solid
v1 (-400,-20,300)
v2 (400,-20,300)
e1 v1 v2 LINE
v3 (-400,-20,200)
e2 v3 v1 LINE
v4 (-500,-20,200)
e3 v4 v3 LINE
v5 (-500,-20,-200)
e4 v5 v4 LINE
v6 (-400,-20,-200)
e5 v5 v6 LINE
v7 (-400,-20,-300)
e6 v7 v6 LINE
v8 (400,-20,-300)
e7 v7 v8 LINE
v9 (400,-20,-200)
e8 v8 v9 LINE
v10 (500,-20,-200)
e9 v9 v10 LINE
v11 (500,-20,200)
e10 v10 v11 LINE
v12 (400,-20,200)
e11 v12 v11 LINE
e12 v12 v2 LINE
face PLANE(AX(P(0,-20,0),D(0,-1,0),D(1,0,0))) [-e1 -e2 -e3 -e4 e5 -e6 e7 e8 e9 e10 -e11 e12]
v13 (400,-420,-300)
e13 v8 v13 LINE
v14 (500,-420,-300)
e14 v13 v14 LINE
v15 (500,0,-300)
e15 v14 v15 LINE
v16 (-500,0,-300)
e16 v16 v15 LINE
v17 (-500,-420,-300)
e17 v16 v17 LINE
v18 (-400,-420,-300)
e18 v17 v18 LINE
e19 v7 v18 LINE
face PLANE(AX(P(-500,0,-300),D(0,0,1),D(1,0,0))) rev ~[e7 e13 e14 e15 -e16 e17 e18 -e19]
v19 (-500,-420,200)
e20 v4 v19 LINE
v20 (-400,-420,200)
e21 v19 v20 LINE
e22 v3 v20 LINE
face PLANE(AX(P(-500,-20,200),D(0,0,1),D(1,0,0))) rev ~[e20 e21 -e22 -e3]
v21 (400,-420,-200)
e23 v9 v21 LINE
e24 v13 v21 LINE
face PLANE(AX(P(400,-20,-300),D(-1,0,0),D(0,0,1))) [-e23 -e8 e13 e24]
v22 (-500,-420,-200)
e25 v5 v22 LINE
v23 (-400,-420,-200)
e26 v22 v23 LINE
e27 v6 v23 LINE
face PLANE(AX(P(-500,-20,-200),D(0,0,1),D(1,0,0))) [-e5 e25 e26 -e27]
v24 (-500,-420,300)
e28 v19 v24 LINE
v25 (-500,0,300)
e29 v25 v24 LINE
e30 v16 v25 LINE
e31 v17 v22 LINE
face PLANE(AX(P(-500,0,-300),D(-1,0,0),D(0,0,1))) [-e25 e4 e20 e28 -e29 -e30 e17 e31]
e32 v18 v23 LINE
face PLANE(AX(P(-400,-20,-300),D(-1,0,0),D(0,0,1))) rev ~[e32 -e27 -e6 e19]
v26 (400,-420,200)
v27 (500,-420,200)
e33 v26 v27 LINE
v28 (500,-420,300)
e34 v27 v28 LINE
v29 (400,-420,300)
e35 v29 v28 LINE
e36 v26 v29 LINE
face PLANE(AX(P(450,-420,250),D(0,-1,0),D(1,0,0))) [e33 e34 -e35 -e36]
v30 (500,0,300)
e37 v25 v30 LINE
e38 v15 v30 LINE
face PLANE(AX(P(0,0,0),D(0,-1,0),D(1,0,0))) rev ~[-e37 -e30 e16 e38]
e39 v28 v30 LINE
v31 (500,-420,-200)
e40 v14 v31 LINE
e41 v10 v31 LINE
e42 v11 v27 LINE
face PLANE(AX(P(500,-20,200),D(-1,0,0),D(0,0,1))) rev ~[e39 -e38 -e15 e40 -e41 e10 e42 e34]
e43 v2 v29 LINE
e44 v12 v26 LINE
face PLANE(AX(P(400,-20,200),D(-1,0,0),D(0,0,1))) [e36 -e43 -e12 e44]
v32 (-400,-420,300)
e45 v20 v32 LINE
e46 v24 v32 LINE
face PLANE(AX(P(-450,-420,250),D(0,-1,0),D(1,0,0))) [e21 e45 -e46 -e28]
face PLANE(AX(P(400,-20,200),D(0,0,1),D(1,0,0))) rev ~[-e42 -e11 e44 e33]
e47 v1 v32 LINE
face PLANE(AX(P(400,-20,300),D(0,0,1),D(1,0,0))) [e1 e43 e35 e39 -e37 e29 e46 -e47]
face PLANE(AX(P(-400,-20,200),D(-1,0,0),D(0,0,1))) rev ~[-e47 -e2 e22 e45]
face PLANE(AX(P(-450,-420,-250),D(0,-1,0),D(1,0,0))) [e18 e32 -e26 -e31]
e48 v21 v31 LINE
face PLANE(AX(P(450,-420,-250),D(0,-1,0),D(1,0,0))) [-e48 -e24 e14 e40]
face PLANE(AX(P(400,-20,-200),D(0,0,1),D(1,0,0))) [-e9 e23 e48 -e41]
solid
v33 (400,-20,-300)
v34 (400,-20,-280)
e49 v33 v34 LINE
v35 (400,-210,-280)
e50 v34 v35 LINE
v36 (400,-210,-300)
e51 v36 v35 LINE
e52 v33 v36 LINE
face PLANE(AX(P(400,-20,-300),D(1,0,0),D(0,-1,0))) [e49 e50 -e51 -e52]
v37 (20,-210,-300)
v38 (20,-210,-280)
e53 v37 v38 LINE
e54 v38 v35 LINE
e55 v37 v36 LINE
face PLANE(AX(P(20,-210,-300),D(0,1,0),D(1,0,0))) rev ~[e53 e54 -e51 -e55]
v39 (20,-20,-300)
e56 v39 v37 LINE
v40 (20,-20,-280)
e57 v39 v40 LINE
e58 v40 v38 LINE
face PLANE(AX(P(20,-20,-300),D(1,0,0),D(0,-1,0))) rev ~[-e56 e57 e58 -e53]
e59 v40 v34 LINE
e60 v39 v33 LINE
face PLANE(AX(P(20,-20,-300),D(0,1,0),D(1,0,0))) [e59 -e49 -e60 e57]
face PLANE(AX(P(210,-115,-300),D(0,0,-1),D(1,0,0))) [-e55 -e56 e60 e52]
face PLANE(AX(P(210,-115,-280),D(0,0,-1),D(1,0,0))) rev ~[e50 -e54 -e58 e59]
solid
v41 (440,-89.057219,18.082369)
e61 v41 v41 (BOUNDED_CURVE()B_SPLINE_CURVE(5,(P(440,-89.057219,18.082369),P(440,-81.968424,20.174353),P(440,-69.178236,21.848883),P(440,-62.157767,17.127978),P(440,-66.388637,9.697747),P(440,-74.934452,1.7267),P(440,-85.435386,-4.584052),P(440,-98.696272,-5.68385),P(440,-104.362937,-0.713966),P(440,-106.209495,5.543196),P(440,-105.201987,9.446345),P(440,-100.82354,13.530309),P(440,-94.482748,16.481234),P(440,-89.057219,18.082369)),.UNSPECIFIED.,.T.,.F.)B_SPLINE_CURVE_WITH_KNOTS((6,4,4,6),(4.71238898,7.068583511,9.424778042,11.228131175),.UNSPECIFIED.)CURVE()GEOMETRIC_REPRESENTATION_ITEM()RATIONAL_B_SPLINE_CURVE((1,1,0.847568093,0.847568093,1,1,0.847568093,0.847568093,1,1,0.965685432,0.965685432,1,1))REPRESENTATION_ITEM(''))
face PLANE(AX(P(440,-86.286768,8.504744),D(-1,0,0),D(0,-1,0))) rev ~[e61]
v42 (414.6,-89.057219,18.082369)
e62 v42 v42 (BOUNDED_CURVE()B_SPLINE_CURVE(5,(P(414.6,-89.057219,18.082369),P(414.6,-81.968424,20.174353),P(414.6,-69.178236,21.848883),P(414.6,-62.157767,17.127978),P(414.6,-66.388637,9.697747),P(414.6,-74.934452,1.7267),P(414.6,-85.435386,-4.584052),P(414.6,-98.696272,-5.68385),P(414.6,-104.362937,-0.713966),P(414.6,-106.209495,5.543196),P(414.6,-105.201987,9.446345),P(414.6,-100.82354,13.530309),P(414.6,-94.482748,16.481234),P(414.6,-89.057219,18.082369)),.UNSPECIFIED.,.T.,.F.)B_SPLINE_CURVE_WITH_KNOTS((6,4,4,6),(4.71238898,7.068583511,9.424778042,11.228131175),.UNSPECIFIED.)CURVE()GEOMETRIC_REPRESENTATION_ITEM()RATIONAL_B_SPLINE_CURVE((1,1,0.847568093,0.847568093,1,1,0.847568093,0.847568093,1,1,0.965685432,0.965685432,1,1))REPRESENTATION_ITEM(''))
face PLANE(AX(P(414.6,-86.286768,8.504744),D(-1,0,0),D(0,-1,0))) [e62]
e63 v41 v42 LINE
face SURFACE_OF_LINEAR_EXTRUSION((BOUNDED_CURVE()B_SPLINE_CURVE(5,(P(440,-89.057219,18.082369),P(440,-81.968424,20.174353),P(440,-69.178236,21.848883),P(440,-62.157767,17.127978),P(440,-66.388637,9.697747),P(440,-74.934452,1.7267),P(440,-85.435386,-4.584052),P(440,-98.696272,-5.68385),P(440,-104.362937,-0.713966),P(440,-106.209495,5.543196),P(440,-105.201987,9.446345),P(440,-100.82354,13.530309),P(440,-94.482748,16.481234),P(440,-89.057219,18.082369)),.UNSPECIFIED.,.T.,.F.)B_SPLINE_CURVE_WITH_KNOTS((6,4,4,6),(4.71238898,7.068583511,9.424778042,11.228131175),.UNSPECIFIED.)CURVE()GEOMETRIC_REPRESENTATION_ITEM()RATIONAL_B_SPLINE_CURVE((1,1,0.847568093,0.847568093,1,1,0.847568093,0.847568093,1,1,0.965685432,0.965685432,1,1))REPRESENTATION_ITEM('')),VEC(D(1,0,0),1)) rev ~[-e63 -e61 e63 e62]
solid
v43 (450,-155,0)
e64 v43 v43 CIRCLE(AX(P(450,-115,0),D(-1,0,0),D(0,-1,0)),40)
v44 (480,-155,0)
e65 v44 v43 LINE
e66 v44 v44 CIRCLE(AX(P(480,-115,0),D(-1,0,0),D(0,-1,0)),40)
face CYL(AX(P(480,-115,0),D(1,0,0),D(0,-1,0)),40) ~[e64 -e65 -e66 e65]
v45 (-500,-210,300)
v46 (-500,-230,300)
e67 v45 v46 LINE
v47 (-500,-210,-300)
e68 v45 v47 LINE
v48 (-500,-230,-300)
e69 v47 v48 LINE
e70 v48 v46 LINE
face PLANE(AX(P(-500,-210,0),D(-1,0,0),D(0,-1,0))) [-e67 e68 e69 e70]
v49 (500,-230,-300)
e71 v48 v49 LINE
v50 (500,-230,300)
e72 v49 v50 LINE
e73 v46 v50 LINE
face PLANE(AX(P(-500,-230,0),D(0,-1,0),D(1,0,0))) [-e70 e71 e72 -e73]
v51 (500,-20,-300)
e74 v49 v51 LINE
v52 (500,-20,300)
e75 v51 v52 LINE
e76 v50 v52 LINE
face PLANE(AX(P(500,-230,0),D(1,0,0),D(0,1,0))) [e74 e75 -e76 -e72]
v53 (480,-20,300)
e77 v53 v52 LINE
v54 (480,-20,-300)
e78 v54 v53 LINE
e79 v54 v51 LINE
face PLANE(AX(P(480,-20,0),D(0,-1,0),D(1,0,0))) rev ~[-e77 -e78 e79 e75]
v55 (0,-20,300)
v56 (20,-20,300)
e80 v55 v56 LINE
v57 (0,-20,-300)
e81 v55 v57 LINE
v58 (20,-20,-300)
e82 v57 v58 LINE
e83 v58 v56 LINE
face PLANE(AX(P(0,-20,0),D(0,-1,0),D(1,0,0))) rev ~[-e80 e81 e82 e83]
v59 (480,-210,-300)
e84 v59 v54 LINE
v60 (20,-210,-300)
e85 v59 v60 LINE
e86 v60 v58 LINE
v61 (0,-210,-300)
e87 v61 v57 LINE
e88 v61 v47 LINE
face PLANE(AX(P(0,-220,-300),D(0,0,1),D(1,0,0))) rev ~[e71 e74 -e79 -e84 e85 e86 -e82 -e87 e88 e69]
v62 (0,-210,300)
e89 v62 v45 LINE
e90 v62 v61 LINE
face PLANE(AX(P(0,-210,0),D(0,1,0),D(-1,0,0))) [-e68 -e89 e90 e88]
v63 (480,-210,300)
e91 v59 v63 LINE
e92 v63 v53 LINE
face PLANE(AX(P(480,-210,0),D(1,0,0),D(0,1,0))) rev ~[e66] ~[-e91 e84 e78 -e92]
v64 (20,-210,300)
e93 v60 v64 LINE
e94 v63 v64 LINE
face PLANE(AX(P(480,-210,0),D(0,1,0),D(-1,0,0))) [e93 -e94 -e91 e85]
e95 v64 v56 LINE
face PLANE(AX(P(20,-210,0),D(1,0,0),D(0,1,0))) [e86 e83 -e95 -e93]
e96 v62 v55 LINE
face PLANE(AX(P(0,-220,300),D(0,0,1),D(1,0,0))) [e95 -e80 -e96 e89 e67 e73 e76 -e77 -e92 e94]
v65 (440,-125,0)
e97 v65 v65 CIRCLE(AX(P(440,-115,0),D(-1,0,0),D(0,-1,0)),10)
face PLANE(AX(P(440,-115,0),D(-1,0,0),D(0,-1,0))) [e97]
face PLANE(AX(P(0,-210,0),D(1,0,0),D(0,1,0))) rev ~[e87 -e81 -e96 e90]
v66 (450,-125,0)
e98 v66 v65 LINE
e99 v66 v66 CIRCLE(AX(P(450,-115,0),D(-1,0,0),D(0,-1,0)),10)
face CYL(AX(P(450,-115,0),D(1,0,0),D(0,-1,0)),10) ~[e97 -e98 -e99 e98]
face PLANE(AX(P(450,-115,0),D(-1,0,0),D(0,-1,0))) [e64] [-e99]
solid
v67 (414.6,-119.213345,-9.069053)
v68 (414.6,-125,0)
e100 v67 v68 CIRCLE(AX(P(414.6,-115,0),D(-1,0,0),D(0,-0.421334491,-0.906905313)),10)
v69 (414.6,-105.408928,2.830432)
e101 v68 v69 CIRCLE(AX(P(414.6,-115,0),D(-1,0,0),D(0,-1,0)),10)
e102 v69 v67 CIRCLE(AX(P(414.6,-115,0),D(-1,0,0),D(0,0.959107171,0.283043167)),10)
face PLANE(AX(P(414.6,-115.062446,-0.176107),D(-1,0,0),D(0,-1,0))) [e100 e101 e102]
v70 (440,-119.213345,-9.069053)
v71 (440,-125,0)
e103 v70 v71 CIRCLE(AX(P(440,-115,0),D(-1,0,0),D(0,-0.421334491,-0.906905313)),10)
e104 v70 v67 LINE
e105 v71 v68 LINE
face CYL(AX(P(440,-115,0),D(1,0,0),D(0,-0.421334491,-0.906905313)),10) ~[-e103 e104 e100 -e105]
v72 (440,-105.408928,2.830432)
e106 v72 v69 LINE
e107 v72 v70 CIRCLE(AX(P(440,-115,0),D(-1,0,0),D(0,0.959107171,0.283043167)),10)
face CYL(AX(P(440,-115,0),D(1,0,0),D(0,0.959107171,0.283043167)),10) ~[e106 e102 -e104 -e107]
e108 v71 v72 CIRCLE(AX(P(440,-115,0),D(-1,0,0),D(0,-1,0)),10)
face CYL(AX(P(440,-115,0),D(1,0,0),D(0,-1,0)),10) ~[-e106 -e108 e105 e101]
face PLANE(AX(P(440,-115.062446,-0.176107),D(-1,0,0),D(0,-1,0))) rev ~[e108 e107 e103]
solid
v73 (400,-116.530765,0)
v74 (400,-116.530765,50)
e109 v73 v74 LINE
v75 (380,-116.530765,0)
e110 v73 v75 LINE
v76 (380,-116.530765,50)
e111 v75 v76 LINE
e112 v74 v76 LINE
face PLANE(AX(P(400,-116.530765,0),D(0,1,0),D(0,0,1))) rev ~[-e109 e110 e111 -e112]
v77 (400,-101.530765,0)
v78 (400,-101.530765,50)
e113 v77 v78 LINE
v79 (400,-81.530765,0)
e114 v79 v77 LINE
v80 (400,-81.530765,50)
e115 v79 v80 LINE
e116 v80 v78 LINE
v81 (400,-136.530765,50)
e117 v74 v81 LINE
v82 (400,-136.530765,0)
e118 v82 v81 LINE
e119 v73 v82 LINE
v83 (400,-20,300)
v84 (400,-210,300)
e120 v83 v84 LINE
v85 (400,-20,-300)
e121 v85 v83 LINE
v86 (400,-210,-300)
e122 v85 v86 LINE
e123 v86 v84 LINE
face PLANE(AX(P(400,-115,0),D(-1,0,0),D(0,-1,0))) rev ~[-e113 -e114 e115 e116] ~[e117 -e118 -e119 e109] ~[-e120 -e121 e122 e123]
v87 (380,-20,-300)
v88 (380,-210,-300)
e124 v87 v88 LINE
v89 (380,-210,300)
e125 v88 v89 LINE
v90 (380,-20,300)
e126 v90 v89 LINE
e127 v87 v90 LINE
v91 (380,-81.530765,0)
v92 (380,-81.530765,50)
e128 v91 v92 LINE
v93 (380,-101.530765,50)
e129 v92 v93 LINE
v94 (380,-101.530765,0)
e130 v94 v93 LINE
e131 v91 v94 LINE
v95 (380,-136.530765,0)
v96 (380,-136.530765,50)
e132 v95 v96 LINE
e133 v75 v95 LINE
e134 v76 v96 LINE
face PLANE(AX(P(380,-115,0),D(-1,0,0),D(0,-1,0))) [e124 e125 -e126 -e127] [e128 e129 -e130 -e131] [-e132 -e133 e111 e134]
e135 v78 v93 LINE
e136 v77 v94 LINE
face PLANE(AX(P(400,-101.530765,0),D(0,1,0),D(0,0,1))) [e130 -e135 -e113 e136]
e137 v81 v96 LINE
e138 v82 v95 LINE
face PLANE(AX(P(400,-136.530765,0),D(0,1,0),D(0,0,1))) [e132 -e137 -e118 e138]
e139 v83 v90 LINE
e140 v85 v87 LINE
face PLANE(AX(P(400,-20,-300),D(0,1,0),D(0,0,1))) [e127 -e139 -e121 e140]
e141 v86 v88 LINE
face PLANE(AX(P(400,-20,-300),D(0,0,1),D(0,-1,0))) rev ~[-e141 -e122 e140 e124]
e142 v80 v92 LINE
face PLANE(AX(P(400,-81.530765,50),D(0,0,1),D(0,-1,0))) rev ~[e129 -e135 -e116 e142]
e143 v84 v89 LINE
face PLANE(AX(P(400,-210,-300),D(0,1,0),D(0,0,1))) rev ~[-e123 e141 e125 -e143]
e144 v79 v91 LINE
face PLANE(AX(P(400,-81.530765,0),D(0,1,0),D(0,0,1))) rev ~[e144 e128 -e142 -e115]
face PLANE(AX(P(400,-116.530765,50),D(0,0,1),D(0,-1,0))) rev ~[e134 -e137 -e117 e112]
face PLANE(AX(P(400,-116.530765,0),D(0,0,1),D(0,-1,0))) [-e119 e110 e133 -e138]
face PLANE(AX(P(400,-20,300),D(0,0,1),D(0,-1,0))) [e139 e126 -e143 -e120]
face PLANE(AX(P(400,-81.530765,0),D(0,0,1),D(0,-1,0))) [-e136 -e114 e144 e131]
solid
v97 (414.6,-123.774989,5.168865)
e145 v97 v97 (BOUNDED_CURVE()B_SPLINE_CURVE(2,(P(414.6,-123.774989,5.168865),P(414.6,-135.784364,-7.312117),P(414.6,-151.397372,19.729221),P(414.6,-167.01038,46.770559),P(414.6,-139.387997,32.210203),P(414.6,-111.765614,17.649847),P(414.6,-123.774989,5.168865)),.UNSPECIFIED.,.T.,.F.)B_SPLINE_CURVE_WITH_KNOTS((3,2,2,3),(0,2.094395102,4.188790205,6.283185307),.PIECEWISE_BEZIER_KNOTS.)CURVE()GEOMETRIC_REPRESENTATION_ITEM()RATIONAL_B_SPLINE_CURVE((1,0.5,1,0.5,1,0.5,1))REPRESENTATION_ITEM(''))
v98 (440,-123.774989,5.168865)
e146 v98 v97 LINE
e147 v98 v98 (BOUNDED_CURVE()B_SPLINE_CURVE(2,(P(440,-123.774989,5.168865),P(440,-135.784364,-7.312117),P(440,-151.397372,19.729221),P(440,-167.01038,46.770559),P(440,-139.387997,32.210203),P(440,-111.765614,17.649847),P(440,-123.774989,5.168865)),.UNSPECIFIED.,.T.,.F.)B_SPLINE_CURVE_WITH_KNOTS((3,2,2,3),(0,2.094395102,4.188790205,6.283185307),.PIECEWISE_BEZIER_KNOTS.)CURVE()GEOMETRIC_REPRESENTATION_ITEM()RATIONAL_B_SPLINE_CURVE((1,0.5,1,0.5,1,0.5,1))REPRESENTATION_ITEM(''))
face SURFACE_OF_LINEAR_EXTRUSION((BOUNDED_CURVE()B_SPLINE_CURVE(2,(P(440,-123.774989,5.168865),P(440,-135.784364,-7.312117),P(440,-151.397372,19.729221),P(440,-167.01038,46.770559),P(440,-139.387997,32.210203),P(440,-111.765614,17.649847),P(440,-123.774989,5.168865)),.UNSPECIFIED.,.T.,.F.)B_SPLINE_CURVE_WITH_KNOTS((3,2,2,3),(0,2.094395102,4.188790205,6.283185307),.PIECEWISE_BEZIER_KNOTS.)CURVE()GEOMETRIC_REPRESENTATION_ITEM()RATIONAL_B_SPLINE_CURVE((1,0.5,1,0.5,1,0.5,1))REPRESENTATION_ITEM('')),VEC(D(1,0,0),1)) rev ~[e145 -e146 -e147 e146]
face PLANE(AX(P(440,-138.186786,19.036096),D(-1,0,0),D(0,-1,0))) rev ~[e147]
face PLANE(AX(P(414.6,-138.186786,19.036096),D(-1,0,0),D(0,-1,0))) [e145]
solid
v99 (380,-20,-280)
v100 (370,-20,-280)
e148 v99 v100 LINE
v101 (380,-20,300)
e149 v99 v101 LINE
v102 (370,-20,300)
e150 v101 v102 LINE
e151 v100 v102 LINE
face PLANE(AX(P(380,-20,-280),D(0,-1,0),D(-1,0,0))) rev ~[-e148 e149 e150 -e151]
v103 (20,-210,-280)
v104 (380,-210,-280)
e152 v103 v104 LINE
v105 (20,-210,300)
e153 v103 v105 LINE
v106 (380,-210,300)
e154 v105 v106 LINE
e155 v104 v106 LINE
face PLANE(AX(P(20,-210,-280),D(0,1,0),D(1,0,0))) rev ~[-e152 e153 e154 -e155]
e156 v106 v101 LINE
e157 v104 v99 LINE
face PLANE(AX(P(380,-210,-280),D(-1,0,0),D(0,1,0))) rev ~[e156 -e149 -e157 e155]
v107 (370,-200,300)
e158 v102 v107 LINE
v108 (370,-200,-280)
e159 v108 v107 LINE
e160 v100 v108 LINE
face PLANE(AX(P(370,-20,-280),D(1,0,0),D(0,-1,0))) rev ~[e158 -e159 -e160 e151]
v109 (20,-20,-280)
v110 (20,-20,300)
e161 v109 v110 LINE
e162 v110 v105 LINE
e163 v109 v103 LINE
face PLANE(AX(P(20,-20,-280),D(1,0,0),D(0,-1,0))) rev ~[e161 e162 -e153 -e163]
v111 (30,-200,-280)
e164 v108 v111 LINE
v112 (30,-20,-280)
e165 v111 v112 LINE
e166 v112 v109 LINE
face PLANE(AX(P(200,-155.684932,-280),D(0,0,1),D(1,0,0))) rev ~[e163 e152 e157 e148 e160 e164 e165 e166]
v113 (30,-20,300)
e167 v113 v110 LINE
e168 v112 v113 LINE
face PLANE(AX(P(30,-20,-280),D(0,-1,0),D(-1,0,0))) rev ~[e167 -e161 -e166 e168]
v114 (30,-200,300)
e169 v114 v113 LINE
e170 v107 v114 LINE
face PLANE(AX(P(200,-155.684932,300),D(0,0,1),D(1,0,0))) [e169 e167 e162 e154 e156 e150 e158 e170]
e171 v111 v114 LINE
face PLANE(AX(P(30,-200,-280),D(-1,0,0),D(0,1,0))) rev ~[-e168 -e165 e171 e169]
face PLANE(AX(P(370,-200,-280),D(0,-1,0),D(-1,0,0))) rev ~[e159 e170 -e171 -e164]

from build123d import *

# Parameters (mm, degrees)
F0_W      = 1000
F0_H      = 600
F1_DEPTH  = 20
F2_W      = 100
F2_H      = 100
F3_DEPTH  = 400
F4_W      = 20
F4_H      = 190
F5_DEPTH  = 300
F6_R      = 40
F7_DEPTH  = 30
F8_R      = 10
F9_DEPTH  = 10
F11_DEPTH = 25.4
F13_DEPTH = 25.4
F14_W     = 190
F14_H     = 600
F14_W_2   = 20
F14_H_2   = 50
F15_DEPTH = 20
F16_W     = 380
F16_H     = 190
F17_DEPTH = 20
F19_DEPTH = 580


# Not quite as in the source:
# - the program builds the solid bodies; features that only make, move or delete a surface that nothing else refers to are left out


with BuildPart() as f1:
    # F0 (on Front) → F1 (new body)
    with BuildSketch(Plane.XZ):
        Rectangle(F0_W, F0_H)
    extrude(amount=F1_DEPTH)

    # F2 (on face) → F3 (join)
    with BuildSketch(Plane.XZ.offset(20)):
        with Locations((450, 250)):
            Rectangle(F2_W, F2_H)
        with Locations((-450, 250)):
            Rectangle(F2_W, F2_H)
        with Locations((450, -250)):
            Rectangle(F2_W, F2_H)
        with Locations((-450, -250)):
            Rectangle(F2_W, F2_H)
    extrude(amount=F3_DEPTH)


with BuildPart() as f5:
    # F4 (on Top) → F5 (new body, symmetric)
    with BuildSketch(Plane.XY):
        Polygon((0, -210), (-500, -210), (-500, -230), (500, -230), (500, -210), (480, -210), (20, -210), align=None)
        with Locations((10, -115)):
            Rectangle(F4_W, F4_H)
        with Locations((490, -115)):
            Rectangle(F4_W, F4_H)
    extrude(amount=F5_DEPTH, both=True)

    # F6 (on face) → F7 (join)
    with BuildSketch(Plane(origin=(480, 0, 0), x_dir=(0, -1, 0), z_dir=(-1, 0, 0))):
        with Locations((115, 0)):
            Circle(F6_R)
    extrude(amount=F7_DEPTH)

    # F8 (on face) → F9 (join)
    with BuildSketch(Plane(origin=(450, 0, 0), x_dir=(0, -1, 0), z_dir=(-1, 0, 0))):
        with Locations((115, 0)):
            Circle(F8_R)
    extrude(amount=F9_DEPTH)


with BuildPart() as f11:
    # F10 (on face) → F11 (new body)
    with BuildSketch(Plane(origin=(440, 0, 0), x_dir=(0, -1, 0), z_dir=(-1, 0, 0))):
        with BuildLine():
            add(Edge.make_bspline(
                [(105.4089282888, 2.8304316686), (108.23936003, 12.4215025071), (89.0572192774, 18.0823691218)],
                knots=[3.1415927352, 3.1415927352, 3.1415927352, 4.7123889804, 4.7123889804, 4.7123889804], degree=2, weights=[1, 0.7071068101, 1]))
            add(Edge.make_bspline(
                [(89.0572192774, 18.0823691218), (42.7474284625, 31.7489119828), (70.6615445509, 5.712223564), (98.5756606394, -20.3244648547), (105.4089282888, 2.8304316686)],
                knots=[4.7123889804, 4.7123889804, 4.7123889804, 7.0685835114, 7.0685835114, 9.4247780424, 9.4247780424, 9.4247780424], degree=2, weights=[1, 0.3826834135, 1, 0.3826834135, 1]))
        make_face()
    extrude(amount=F11_DEPTH)


with BuildPart() as f11b:
    # F10 (on face) → F11, piece 2 (new body)
    with BuildSketch(Plane(origin=(440, 0, 0), x_dir=(0, -1, 0), z_dir=(-1, 0, 0))):
        with BuildLine():
            add(Edge.make_bspline(
                [(123.7749888492, 5.1688648912), (135.7843636375, -7.3121173295), (151.397371578, 19.7292210814), (167.0103795184, 46.7705594923), (139.3879967896, 32.2102033021), (111.7656140609, 17.6498471119), (123.7749888492, 5.1688648912)],
                knots=[0, 0, 0, 2.0943951024, 2.0943951024, 4.1887902048, 4.1887902048, 6.2831853072, 6.2831853072, 6.2831853072], degree=2, weights=[1, 0.5, 1, 0.5, 1, 0.5, 1]))
        make_face()
    extrude(amount=F11_DEPTH)


with BuildPart() as f13:
    # F10 (on face) → F13 (new body)
    with BuildSketch(Plane(origin=(440, 0, 0), x_dir=(0, -1, 0), z_dir=(-1, 0, 0))):
        with BuildLine():
            ThreePointArc((125, 0), (116.4299095929, 9.8972399464), (105.4089282888, 2.8304316686))
            ThreePointArc((105.4089282888, 2.8304316686), (108.4708790022, -7.5743368684), (119.2133449098, -9.0690531298))
            ThreePointArc((119.2133449098, -9.0690531298), (123.4301082169, -5.3789660206), (125, 0))
        make_face()
    extrude(amount=F13_DEPTH)


with BuildPart() as f15:
    # F14 (on face) → F15 (new body)
    with BuildSketch(Plane(origin=(400, 0, 0), x_dir=(0, -1, 0), z_dir=(-1, 0, 0))):
        with Locations((115, 0)):
            Rectangle(F14_W, F14_H)
        with Locations((91.530764699, 25)):
            Rectangle(F14_W_2, F14_H_2, mode=Mode.SUBTRACT)
        with Locations((126.530764699, 25)):
            Rectangle(F14_W_2, F14_H_2, mode=Mode.SUBTRACT)
    extrude(amount=F15_DEPTH)


with BuildPart() as f17:
    # F16 (on face) → F17 (new body)
    with BuildSketch(Plane(origin=(0, 0, -300), x_dir=(1, 0, 0), z_dir=(0, 0, -1))):
        with Locations((210, 115)):
            Rectangle(F16_W, F16_H)
    extrude(amount=-F17_DEPTH)


with BuildPart() as f19:
    # F18 (on face) → F19 (new body)
    with BuildSketch(Plane.XY.offset(-280)):
        Polygon((30, -20), (20, -20), (20, -210), (380, -210), (380, -20), (370, -20), (370, -200), (30, -200), align=None)
    extrude(amount=F19_DEPTH)


solid = Compound([f1.part, f5.part, f11.part, f11b.part, f13.part, f15.part, f17.part, f19.part])
